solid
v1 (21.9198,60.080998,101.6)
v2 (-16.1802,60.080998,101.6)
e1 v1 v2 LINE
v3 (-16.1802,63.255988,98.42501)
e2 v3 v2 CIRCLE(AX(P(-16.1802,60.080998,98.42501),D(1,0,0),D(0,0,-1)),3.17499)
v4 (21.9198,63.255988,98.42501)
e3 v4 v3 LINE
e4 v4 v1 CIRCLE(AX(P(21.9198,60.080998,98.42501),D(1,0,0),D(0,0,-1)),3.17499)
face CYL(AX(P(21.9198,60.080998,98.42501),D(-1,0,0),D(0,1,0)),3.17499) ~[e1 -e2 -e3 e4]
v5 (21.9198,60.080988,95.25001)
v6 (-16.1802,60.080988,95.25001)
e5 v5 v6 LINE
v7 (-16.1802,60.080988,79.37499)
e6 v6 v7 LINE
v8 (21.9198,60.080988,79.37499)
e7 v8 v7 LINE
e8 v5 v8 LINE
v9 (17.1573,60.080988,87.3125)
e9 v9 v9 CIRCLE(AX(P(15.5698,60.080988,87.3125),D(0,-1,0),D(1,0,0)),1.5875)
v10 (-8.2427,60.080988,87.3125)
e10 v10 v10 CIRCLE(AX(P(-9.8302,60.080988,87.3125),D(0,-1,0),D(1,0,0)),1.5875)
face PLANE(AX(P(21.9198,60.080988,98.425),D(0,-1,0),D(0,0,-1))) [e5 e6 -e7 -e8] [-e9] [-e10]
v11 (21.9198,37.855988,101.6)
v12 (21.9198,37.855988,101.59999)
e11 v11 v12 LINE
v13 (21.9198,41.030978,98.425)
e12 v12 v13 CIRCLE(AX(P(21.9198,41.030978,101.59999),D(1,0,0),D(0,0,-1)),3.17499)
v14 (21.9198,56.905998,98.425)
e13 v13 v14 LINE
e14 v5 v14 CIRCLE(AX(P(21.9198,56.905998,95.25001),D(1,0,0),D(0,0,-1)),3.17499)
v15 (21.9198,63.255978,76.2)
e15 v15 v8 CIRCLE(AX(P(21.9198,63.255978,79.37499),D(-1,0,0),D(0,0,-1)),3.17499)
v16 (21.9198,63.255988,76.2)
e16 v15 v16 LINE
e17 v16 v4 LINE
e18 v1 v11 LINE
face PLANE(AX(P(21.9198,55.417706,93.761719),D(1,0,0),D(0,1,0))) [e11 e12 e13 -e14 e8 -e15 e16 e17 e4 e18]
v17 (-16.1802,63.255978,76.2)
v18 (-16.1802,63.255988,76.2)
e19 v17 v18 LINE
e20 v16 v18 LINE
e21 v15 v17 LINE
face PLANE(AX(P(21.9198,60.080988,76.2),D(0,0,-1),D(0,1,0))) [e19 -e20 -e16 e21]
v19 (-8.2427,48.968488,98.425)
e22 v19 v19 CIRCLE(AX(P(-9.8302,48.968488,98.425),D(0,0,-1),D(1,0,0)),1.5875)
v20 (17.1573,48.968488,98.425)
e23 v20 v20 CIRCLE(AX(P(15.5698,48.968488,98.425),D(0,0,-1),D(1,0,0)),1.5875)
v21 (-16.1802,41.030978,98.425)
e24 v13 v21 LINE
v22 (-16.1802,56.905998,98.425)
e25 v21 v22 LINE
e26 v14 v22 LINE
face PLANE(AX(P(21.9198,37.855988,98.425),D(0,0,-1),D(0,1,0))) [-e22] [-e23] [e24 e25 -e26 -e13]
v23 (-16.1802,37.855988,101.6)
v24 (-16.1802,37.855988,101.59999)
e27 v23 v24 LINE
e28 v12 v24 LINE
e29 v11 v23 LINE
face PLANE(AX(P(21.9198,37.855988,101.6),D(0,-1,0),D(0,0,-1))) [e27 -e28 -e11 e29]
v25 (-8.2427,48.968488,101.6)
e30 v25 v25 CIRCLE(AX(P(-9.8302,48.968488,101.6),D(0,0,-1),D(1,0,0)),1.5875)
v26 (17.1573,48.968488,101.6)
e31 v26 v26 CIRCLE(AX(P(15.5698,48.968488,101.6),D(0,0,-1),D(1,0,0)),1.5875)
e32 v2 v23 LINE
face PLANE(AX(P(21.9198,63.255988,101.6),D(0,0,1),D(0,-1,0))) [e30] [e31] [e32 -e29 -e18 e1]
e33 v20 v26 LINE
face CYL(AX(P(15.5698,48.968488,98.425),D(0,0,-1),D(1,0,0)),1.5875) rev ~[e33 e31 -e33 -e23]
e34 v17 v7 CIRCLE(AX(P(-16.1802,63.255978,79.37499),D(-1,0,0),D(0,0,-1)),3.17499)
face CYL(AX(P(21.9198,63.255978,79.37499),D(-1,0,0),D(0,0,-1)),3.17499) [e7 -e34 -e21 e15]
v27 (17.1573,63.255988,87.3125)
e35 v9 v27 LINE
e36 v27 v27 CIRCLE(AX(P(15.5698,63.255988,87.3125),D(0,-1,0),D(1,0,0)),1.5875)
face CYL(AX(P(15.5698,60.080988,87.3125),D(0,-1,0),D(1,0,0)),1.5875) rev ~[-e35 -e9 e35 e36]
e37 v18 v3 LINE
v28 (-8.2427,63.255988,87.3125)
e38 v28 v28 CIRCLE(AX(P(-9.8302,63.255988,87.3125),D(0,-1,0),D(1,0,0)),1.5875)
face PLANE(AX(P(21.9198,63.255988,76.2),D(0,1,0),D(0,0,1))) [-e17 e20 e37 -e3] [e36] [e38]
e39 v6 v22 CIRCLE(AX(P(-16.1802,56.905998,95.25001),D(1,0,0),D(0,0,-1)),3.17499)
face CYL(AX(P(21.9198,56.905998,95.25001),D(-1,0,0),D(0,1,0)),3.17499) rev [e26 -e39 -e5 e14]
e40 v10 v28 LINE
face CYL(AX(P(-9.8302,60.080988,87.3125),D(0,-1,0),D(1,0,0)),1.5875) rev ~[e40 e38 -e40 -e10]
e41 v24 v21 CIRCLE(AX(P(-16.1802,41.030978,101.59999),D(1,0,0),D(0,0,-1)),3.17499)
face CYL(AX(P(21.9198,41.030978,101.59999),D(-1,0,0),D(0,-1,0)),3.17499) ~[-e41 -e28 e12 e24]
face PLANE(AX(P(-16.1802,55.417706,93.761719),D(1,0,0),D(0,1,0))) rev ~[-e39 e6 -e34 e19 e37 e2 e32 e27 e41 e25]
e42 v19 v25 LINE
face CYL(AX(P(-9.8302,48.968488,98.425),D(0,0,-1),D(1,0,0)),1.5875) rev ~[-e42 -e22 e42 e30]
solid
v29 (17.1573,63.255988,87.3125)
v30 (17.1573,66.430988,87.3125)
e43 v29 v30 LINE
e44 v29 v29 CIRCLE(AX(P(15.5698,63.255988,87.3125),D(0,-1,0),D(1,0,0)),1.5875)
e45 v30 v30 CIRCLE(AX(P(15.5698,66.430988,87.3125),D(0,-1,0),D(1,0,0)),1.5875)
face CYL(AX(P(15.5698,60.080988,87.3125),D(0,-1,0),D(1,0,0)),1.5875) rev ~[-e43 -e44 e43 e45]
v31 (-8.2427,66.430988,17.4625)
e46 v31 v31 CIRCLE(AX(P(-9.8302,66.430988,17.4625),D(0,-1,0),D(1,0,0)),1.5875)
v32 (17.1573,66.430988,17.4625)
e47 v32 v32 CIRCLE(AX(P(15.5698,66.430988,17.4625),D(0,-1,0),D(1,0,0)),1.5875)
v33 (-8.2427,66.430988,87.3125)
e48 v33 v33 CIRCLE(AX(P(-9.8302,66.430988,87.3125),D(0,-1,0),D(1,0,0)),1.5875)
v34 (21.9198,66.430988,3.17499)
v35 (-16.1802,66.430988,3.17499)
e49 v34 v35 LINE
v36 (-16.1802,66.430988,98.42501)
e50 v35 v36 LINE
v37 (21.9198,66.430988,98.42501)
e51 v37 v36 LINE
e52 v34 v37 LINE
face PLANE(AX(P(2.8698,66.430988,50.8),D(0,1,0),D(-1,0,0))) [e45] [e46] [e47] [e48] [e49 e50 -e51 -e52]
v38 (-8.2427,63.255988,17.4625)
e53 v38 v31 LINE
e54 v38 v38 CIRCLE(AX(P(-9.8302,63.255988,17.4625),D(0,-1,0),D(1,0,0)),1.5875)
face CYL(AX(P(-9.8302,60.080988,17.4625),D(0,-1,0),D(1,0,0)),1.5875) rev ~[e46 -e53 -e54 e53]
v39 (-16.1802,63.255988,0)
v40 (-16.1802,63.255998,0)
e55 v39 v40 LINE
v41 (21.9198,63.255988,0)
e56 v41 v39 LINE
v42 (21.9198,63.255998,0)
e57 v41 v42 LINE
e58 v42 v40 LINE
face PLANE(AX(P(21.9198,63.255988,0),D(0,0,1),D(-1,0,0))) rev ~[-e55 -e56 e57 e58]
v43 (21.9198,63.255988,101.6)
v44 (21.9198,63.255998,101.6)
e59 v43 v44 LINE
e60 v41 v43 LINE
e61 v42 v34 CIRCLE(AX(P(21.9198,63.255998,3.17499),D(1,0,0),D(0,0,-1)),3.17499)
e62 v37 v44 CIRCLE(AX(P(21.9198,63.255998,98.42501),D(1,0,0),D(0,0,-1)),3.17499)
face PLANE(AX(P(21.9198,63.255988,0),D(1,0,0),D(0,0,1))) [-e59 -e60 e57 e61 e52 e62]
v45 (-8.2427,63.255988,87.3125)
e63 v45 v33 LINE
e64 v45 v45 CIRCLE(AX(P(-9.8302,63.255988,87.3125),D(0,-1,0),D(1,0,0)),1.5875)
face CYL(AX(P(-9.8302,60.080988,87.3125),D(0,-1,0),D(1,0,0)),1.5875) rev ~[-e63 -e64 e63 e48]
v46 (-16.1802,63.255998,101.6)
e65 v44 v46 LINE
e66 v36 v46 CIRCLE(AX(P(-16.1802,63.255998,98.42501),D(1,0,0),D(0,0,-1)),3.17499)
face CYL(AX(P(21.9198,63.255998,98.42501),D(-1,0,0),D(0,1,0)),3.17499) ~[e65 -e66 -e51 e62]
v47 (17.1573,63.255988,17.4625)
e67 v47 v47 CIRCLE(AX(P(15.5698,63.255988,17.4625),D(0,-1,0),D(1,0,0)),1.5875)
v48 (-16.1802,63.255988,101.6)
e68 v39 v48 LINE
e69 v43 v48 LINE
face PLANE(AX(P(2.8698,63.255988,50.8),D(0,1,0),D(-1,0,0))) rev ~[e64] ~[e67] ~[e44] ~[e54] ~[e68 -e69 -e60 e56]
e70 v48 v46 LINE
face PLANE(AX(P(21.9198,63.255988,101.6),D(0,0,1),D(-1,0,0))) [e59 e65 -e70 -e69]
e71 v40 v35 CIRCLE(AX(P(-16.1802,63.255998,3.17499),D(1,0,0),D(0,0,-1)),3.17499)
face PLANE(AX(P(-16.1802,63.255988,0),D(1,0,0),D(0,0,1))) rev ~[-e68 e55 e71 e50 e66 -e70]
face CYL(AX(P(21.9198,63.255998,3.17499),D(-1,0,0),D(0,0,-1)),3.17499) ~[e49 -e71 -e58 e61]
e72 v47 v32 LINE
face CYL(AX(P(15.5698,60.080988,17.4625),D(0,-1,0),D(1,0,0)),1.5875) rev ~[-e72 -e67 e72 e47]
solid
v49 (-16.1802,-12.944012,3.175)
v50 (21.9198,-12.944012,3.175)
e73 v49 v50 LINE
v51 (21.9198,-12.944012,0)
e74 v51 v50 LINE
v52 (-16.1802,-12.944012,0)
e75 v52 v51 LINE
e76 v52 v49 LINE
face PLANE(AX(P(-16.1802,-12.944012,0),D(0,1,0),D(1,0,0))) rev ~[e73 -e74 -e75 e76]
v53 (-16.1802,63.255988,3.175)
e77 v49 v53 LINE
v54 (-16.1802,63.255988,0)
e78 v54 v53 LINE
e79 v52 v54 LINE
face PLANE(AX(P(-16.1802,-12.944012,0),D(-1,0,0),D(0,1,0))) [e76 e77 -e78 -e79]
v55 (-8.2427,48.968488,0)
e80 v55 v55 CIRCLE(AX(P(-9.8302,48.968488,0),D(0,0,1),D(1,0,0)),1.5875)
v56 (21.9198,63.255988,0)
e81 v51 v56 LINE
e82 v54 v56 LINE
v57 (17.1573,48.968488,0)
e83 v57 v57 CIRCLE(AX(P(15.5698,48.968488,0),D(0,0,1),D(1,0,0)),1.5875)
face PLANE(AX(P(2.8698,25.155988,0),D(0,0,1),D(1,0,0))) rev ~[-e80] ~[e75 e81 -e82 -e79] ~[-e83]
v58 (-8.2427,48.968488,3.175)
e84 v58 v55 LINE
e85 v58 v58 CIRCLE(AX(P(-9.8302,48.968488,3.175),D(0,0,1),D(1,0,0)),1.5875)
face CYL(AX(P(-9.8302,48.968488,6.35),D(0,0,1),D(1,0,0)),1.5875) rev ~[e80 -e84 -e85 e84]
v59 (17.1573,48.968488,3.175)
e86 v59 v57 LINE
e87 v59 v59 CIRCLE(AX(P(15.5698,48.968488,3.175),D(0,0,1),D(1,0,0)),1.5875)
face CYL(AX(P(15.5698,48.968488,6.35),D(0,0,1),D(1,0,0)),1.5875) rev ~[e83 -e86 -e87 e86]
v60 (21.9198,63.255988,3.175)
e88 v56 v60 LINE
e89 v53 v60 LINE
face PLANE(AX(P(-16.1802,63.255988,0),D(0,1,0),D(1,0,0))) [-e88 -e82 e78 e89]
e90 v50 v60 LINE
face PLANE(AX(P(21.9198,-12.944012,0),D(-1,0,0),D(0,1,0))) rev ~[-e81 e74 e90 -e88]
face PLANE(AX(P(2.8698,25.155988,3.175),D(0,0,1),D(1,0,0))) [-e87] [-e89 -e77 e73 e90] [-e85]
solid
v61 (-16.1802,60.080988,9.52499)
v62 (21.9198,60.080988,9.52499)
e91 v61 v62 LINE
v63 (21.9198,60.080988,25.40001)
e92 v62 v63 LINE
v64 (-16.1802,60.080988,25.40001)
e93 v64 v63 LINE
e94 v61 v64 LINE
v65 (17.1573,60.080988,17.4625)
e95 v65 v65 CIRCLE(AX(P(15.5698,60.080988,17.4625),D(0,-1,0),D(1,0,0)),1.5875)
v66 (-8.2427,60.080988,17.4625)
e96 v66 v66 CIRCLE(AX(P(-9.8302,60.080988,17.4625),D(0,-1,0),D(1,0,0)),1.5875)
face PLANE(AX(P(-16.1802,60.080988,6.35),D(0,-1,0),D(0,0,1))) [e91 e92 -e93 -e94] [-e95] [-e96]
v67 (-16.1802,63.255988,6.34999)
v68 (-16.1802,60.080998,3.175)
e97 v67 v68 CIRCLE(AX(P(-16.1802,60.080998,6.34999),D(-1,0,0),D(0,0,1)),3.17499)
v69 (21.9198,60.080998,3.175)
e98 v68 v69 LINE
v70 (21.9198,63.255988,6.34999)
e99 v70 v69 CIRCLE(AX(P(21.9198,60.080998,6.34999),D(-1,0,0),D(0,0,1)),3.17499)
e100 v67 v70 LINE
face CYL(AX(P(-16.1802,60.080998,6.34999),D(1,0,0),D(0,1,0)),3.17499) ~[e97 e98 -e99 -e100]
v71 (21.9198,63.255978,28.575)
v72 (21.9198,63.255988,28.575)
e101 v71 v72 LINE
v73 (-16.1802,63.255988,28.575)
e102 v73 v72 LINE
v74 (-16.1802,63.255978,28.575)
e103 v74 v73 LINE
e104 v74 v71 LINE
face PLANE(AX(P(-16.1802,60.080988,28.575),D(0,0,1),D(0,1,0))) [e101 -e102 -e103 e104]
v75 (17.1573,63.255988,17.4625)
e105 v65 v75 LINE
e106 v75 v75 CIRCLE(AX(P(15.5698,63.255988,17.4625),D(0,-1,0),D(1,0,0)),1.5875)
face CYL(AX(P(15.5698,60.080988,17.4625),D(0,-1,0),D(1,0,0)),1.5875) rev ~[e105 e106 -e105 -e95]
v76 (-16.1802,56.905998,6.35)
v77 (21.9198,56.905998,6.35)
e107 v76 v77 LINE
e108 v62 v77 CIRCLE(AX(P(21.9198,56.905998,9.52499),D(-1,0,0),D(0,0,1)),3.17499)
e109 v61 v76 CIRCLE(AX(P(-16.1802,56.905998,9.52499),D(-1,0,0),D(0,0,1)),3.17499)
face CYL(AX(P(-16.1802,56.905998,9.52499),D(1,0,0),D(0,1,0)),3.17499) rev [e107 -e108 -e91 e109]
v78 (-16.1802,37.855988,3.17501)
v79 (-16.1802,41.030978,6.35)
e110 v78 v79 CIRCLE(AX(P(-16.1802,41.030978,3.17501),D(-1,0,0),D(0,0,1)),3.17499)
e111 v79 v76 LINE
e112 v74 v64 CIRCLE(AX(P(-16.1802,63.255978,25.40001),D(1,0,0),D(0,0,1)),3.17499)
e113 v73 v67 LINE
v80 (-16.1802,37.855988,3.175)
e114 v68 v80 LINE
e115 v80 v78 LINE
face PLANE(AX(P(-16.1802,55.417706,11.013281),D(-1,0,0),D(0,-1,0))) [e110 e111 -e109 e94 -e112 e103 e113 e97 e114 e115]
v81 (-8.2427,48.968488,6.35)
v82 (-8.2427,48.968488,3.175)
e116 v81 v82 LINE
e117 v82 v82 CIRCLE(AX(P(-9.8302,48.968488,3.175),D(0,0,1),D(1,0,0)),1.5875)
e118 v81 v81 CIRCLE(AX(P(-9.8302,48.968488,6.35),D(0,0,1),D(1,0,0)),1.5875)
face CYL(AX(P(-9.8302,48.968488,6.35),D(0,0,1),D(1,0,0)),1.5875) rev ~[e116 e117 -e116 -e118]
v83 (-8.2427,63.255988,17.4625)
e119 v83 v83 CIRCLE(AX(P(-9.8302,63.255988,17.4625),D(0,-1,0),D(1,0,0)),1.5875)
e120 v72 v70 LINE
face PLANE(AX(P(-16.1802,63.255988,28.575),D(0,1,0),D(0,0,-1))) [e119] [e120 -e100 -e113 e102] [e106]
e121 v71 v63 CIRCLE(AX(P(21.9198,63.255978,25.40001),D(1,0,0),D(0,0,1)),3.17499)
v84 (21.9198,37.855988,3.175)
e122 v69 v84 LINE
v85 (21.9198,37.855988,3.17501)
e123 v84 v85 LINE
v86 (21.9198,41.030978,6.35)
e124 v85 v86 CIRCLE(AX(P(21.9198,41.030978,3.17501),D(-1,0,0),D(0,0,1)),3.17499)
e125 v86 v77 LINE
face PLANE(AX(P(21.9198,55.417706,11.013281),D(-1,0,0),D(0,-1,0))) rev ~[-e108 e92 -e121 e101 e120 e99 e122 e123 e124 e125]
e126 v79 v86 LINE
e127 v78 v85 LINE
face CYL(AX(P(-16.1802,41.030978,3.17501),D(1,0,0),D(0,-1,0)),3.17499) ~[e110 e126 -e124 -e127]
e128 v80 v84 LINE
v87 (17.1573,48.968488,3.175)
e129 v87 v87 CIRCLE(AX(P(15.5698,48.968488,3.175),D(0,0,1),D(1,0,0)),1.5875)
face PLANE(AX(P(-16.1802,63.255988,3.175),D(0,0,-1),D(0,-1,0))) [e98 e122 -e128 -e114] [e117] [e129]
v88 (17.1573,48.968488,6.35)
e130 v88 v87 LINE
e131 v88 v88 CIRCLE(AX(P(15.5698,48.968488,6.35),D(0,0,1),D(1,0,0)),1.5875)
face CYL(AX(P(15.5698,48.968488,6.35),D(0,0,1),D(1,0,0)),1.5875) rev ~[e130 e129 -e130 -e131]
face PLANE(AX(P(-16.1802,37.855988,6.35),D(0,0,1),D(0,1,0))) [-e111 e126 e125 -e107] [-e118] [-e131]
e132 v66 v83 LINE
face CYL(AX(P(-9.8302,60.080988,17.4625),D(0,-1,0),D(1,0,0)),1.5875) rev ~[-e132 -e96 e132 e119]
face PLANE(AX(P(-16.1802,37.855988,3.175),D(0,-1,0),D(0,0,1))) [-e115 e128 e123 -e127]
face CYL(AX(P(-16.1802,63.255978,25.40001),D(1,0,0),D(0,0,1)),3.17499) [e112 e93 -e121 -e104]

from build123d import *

# Parameters (mm, degrees)
F0_W      = 38.1
F0_H      = 76.2
F1_DEPTH  = 3.175
F3_DEPTH  = 38.1
F4_R      = 1.5875
F5_DEPTH  = 25.4
F6_W      = 38.1
F6_H      = 101.6
F7_DEPTH  = 3.175
F8_R      = 1.5875
F9_DEPTH  = 25.4
F10_R     = 3.17499
F12_DEPTH = 38.1
F13_R     = 1.5875
F15_DEPTH = 25.4
F14_R     = 1.5875
F16_DEPTH = 25.4
F17_R     = 3.17499
F17_2_R   = 3.17499
F18_R     = 3.17499


# Not quite as in the source:
# - a fillet or chamfer is up to 0.001 mm smaller than in the source, because OpenCascade refuses the exact size


with BuildPart() as f1:
    # F0 (on Top) → F1 (new body)
    with BuildSketch(Plane.XY):
        with Locations((2.8697997332, 25.1559876483)):
            Rectangle(F0_W, F0_H)
    extrude(amount=F1_DEPTH)


with BuildPart() as f3:
    # F2 (on face) → F3 (new body)
    with BuildSketch(Plane(origin=(-16.1802002668, 0, 0), x_dir=(0, -1, 0), z_dir=(-1, 0, 0))):
        Polygon((-63.2559876483, 28.575), (-63.2559876483, 3.175), (-37.8559876483, 3.175), (-37.8559876483, 6.35), (-60.0809876483, 6.35), (-60.0809876483, 28.575), align=None)
    extrude(amount=-F3_DEPTH)


with BuildPart() as f5_tool:
    # F4 (on face) → F5 (new body)
    with BuildSketch(Plane.XY.offset(6.35)):
        with Locations((-9.8302002668, 48.9684876483)):
            Circle(F4_R)
        with Locations((15.5697997332, 48.9684876483)):
            Circle(F4_R)
    extrude(amount=-F5_DEPTH)


with BuildPart() as f1_1:
    add(f1.part)

    # F5: cut by f5_tool
    add(f5_tool.part, mode=Mode.SUBTRACT)


with BuildPart() as f3_1:
    add(f3.part)

    # F5: cut by f5_tool
    add(f5_tool.part, mode=Mode.SUBTRACT)


with BuildPart() as f7:
    # F6 (on face) → F7 (new body)
    with BuildSketch(Plane(origin=(0, 63.2559876483, 0), x_dir=(-1, 0, 0), z_dir=(0, 1, 0))):
        with Locations((-2.8697997332, 50.8)):
            Rectangle(F6_W, F6_H)
    extrude(amount=F7_DEPTH)


with BuildPart() as f9_tool:
    # F8 (on face) → F9 (new body)
    with BuildSketch(Plane.XZ.offset(-60.0809876483)):
        with Locations((-9.8302002668, 17.4625)):
            Circle(F8_R)
        with Locations((15.5697997332, 17.4625)):
            Circle(F8_R)
    extrude(amount=-F9_DEPTH)


with BuildPart() as f3_2:
    add(f3_1.part)

    # F9: cut by f9_tool
    add(f9_tool.part, mode=Mode.SUBTRACT)

    # F17#2 (radius 3.175 in the source; OpenCascade refuses exactly that, so slightly less here)
    f17_2_edges = [f3_2.edges().sort_by_distance(p)[0] for p in [
        (2.8698, 60.080988, 28.575),
        (2.8698, 37.855988, 6.35),
        (2.8698, 60.080988, 6.35),
        (2.8698, 63.255988, 3.175),
    ]]
    fillet(f17_2_edges, radius=F17_2_R)


with BuildPart() as f7_1:
    add(f7.part)

    # F9: cut by f9_tool
    add(f9_tool.part, mode=Mode.SUBTRACT)

    # F10 (radius 3.175 in the source; OpenCascade refuses exactly that, so slightly less here)
    f10_edges = [f7_1.edges().sort_by_distance(p)[0] for p in [
        (2.8698, 66.430988, 0),
    ]]
    fillet(f10_edges, radius=F10_R)


with BuildPart() as f12:
    # F11 (on face) → F12 (new body)
    with BuildSketch(Plane.YZ.offset(21.9197997332)):
        Polygon((63.2559876483, 76.2), (63.2559876483, 101.6), (37.8559876483, 101.6), (37.8559876483, 98.425), (60.0809876483, 98.425), (60.0809876483, 76.2), align=None)
    extrude(amount=-F12_DEPTH)


with BuildPart() as f15_tool:
    # F13 (on face) → F15 (new body)
    with BuildSketch(Plane.XZ.offset(-60.0809876483)):
        with Locations((-9.8302002668, 87.3125)):
            Circle(F13_R)
        with Locations((15.5697997332, 87.3125)):
            Circle(F13_R)
    extrude(amount=-F15_DEPTH)


with BuildPart() as f7_2:
    add(f7_1.part)

    # F15: cut by f15_tool
    add(f15_tool.part, mode=Mode.SUBTRACT)

    # F18 (radius 3.175 in the source; OpenCascade refuses exactly that, so slightly less here)
    f18_edges = [f7_2.edges().sort_by_distance(p)[0] for p in [
        (2.8698, 66.430988, 101.6),
    ]]
    fillet(f18_edges, radius=F18_R)


with BuildPart() as f12_1:
    add(f12.part)

    # F15: cut by f15_tool
    add(f15_tool.part, mode=Mode.SUBTRACT)

    # F14 (on face) → F16 (cut)
    with BuildSketch(Plane(origin=(0, 0, 98.425), x_dir=(1, 0, 0), z_dir=(0, 0, -1))):
        with Locations((-9.8302002668, -48.9684876483)):
            Circle(F14_R)
        with Locations((15.5697997332, -48.9684876483)):
            Circle(F14_R)
    extrude(amount=-F16_DEPTH, mode=Mode.SUBTRACT)

    # F17 (radius 3.175 in the source; OpenCascade refuses exactly that, so slightly less here)
    f17_edges = [f12_1.edges().sort_by_distance(p)[0] for p in [
        (2.8698, 60.080988, 98.425),
        (2.8698, 60.080988, 76.2),
        (2.8698, 63.255988, 101.6),
        (2.8698, 37.855988, 98.425),
    ]]
    fillet(f17_edges, radius=F17_R)


solid = Compound([f1_1.part, f3_2.part, f7_2.part, f12_1.part])
